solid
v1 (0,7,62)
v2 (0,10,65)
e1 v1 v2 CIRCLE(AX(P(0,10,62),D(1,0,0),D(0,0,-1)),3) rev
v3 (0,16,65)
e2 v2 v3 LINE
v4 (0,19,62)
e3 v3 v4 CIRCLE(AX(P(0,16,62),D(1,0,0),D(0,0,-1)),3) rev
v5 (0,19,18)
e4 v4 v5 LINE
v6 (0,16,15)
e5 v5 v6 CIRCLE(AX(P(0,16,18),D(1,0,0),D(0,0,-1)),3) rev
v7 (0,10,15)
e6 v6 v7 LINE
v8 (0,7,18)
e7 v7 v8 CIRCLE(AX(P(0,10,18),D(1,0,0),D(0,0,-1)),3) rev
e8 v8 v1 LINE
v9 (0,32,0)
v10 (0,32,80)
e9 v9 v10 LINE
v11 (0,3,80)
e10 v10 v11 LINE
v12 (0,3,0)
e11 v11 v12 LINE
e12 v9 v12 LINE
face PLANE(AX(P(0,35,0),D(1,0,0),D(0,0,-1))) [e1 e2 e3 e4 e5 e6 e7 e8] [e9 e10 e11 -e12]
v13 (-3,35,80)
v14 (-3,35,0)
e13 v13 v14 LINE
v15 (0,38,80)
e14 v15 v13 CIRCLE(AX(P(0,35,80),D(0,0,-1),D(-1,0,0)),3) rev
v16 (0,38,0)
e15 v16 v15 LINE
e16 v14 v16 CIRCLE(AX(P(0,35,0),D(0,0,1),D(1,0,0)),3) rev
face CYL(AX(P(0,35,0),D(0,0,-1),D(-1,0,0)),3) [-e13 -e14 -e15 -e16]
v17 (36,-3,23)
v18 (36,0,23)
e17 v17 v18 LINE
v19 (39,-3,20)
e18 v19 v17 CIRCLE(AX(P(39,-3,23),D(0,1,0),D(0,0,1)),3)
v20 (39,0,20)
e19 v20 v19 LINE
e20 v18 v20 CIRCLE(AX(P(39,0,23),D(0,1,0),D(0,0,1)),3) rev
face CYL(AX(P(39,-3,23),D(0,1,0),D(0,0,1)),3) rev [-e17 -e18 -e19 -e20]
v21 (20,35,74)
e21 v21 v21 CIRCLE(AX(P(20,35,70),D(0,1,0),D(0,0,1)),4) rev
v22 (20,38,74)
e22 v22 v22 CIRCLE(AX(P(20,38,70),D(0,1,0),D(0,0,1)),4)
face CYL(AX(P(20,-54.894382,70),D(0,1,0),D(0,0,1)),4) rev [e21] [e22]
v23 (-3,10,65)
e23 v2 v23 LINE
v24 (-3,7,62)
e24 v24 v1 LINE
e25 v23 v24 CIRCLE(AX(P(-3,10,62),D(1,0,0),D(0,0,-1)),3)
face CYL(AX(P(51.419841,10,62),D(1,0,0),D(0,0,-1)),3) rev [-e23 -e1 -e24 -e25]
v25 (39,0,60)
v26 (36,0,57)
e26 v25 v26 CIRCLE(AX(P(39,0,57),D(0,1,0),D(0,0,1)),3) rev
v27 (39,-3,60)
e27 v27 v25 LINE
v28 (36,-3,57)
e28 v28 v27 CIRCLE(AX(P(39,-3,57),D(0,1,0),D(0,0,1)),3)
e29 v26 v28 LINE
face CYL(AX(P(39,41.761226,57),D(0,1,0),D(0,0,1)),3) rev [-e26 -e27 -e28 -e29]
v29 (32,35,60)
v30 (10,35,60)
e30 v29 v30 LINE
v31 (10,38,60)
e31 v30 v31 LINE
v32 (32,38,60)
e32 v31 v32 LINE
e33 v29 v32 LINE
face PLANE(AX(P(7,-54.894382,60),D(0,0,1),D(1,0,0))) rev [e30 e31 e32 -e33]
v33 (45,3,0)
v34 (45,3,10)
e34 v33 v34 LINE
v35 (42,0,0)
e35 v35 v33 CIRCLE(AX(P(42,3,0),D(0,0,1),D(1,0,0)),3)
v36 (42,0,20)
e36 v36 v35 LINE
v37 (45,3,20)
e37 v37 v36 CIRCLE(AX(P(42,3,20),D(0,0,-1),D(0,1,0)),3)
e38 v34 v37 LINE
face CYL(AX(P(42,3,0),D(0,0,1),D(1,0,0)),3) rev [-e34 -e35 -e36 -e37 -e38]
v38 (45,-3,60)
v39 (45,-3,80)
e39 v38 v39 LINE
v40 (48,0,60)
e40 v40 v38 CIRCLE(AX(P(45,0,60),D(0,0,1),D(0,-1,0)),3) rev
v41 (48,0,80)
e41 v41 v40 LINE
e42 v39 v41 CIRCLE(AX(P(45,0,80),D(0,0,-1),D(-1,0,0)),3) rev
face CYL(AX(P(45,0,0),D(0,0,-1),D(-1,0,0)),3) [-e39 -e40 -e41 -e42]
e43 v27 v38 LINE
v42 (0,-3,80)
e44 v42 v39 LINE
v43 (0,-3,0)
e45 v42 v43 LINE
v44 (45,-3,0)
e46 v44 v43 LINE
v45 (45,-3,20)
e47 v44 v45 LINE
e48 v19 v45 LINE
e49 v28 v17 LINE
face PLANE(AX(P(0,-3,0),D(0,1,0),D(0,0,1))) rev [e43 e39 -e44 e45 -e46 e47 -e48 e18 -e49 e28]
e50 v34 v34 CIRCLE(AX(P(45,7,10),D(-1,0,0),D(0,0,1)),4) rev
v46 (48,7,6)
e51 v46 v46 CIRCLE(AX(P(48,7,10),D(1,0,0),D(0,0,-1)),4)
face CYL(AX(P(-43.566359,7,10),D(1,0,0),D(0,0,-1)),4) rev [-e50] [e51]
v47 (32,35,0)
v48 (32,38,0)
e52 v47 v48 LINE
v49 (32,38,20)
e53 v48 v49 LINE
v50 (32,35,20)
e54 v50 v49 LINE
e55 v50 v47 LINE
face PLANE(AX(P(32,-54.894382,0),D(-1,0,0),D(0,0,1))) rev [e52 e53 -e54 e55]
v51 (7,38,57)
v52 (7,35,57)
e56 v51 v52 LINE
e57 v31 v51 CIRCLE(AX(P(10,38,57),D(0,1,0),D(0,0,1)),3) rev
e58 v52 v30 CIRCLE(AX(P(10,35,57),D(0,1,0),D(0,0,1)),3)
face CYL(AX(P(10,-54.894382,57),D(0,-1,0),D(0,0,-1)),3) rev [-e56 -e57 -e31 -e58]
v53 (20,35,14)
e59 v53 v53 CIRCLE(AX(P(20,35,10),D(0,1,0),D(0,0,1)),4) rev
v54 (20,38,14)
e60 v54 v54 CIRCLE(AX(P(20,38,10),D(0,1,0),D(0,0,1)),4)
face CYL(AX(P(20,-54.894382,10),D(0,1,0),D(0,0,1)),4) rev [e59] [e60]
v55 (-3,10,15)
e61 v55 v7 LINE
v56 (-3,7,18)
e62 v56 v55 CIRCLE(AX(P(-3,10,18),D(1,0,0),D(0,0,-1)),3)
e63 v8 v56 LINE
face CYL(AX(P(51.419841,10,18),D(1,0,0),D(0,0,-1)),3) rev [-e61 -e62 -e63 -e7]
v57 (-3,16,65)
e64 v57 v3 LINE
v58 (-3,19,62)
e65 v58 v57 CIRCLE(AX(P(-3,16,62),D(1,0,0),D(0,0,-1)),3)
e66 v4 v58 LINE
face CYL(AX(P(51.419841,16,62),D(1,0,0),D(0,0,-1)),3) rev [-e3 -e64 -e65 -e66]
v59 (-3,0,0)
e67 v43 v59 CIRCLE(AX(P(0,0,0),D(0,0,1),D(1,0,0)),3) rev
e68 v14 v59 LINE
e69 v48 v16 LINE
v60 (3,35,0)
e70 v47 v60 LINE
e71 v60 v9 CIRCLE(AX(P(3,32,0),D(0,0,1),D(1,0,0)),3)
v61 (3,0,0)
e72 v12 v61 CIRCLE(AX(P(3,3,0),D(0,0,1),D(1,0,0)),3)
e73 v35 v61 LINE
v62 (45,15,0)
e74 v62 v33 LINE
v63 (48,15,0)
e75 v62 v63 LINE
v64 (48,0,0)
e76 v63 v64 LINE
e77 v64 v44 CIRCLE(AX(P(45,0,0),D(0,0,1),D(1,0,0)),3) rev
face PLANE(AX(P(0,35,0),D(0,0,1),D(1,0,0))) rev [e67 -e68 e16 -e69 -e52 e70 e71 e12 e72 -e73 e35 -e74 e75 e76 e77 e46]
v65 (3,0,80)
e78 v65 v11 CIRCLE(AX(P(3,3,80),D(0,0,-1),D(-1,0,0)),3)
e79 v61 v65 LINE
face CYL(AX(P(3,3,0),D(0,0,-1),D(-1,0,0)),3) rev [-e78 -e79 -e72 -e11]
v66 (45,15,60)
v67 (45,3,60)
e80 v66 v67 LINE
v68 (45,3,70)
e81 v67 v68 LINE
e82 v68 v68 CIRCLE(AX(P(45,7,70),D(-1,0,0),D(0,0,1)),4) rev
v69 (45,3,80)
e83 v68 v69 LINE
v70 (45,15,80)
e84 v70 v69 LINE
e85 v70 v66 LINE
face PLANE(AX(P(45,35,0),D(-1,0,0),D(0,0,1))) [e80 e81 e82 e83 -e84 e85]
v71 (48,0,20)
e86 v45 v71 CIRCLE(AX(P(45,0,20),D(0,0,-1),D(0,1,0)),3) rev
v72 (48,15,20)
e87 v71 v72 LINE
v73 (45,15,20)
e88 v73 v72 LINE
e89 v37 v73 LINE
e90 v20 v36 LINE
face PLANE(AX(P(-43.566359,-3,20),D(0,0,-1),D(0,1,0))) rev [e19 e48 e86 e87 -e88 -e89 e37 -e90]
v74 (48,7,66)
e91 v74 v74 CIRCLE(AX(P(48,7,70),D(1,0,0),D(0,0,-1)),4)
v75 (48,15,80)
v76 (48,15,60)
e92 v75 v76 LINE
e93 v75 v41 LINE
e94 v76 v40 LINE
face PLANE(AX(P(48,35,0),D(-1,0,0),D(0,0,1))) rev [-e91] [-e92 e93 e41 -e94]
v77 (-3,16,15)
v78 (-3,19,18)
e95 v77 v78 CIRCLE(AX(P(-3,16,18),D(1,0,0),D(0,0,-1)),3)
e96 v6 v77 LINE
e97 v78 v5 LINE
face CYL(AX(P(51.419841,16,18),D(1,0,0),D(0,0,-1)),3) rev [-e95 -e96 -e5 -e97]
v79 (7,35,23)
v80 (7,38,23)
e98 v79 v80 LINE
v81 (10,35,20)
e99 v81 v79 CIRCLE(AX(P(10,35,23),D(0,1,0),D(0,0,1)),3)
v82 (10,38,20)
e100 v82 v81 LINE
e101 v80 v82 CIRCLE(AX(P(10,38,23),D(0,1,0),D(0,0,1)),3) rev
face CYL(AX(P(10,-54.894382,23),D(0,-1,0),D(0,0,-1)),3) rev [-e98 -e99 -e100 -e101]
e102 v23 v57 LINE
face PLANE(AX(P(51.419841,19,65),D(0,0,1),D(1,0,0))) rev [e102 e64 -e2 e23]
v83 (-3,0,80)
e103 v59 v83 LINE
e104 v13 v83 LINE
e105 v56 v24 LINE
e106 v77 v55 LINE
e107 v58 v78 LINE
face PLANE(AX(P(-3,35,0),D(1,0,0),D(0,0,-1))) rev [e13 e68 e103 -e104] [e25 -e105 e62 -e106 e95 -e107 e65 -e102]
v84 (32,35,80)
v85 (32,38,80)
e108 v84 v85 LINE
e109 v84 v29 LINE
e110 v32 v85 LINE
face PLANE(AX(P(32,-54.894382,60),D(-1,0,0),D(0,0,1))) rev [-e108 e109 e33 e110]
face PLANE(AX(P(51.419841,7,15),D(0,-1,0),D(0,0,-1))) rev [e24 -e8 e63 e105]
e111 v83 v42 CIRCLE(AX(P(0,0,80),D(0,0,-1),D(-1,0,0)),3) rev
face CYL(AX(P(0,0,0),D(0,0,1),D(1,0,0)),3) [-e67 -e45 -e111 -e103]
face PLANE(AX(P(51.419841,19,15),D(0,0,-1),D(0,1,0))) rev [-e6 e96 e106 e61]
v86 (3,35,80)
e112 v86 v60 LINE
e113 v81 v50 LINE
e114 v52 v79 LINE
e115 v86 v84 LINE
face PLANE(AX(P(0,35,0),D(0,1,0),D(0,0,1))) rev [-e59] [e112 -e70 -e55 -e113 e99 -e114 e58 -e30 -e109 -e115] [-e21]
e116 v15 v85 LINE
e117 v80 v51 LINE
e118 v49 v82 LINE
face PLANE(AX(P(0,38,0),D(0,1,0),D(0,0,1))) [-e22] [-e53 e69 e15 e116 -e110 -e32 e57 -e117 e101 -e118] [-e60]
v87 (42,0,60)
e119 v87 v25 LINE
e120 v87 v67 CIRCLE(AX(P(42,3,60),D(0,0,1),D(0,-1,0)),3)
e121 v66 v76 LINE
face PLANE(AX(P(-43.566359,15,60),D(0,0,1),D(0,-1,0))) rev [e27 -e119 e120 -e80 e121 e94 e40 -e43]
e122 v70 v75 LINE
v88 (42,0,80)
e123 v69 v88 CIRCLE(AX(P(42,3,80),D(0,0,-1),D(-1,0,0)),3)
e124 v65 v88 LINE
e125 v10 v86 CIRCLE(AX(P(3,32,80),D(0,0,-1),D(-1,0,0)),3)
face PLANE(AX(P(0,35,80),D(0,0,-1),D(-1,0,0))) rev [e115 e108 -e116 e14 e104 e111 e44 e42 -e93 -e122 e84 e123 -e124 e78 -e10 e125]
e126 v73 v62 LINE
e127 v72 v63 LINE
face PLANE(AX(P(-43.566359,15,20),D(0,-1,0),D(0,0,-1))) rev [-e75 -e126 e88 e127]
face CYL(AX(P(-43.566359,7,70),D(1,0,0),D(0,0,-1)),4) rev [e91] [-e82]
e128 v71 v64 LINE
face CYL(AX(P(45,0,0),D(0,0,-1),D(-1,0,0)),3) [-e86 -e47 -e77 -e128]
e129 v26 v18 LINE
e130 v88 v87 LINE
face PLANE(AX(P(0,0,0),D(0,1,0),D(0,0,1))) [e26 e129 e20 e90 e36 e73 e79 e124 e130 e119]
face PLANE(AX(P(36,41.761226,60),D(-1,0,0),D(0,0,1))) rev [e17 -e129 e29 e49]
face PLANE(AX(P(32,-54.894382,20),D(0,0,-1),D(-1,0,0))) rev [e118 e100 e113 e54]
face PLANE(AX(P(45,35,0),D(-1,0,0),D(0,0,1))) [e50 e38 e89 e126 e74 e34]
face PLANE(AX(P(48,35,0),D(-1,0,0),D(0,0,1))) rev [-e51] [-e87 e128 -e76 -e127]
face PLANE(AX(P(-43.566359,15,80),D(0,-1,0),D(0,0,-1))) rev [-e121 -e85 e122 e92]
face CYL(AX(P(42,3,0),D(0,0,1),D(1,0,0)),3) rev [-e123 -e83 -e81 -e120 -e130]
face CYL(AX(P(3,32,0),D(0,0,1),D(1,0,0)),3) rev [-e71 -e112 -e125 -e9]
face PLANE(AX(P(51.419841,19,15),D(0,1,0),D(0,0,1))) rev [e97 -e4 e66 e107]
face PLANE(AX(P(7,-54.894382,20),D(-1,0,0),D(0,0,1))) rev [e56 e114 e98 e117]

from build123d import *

# Parameters (mm, degrees)
SKETCH2_W           = 45
SKETCH2_H           = 80
BOSS_EXTRUDE2_DEPTH = 35
SHELL2_T            = 3
SKETCH5_R           = 4
CUT_EXTRUDE1_DEPTH  = 3
SKETCH6_R           = 4
CUT_EXTRUDE2_DEPTH  = 3
SKETCH7_W           = 12
SKETCH7_H           = 40
CUT_EXTRUDE3_DEPTH  = 3
SKETCH8_W           = 50
SKETCH8_H           = 12
CUT_EXTRUDE4_DEPTH  = 3
FILLET1_R           = 3
FILLET2_R           = 3


with BuildPart() as part:
    # Sketch2 → Boss-Extrude2 (new body)
    with BuildSketch(Plane(origin=(0, 0, 0), x_dir=(1, 0, 0), z_dir=(0, 1, 0))):
        with Locations((22.5, -40)):
            Rectangle(SKETCH2_W, SKETCH2_H)
    extrude(amount=BOSS_EXTRUDE2_DEPTH)

    # Shell2
    shell2_openings = [part.faces().sort_by_distance(p)[0] for p in [
        (22.5, 17.5, 0),
        (22.5, 17.5, 80),
    ]]
    offset(amount=SHELL2_T, openings=shell2_openings, kind=Kind.INTERSECTION)

    # Sketch5 → Cut-Extrude1 (cut)
    with BuildSketch(Plane(origin=(0, 38, 0), x_dir=(1, 0, 0), z_dir=(0, 1, 0))):
        with Locations(Location((20, -70, 0), (0, 0, 270))):
            Circle(SKETCH5_R)
        with Locations(Location((20, -10, 0), (0, 0, 270))):
            Circle(SKETCH5_R)
        Polygon((32, 0), (32, -20), (7, -20), (7, -60), (32, -60), (32, -80), (48, -80), (48, 0), align=None)
    extrude(amount=-CUT_EXTRUDE1_DEPTH, mode=Mode.SUBTRACT)

    # Sketch6 → Cut-Extrude2 (cut)
    with BuildSketch(Plane(origin=(48, 0, 0), x_dir=(0, 0, -1), z_dir=(1, 0, 0))):
        with Locations((-70, 7)):
            Circle(SKETCH6_R)
        with Locations((-10, 7)):
            Circle(SKETCH6_R)
        Polygon((-80, 15), (-60, 15), (-60, -3), (-20, -3), (-20, 15), (0, 15), (0, 35), (-80, 35), align=None)
    extrude(amount=-CUT_EXTRUDE2_DEPTH, mode=Mode.SUBTRACT)

    # Sketch7 → Cut-Extrude3 (cut)
    with BuildSketch(Plane.XZ.offset(3)):
        with Locations((42, 40)):
            Rectangle(SKETCH7_W, SKETCH7_H)
    extrude(amount=-CUT_EXTRUDE3_DEPTH, mode=Mode.SUBTRACT)

    # Sketch8 → Cut-Extrude4 (cut)
    with BuildSketch(Plane.ZY.offset(3)):
        with Locations((40, 13)):
            Rectangle(SKETCH8_W, SKETCH8_H)
    extrude(amount=-CUT_EXTRUDE4_DEPTH, mode=Mode.SUBTRACT)

    # Fillet1
    fillet1_edges = [part.edges().sort_by_distance(p)[0] for p in [
        (36, -1.5, 60),
        (36, -1.5, 20),
        (0, 0, 40),
        (45, 0, 70),
        (0, 35, 40),
        (7, 36.5, 60),
        (7, 36.5, 20),
        (-3, 38, 40),
        (48, -3, 70),
        (-3, -3, 40),
        (45, 0, 10),
        (48, -3, 10),
    ]]
    fillet(fillet1_edges, radius=FILLET1_R - 0.0001)  # a hair under: the kernel refuses the full size

    # Fillet2
    fillet2_edges = [part.edges().sort_by_distance(p)[0] for p in [
        (-1.5, 7, 65),
        (-1.5, 19, 65),
        (-1.5, 19, 15),
        (-1.5, 7, 15),
    ]]
    fillet(fillet2_edges, radius=FILLET2_R)


solid = part.part
